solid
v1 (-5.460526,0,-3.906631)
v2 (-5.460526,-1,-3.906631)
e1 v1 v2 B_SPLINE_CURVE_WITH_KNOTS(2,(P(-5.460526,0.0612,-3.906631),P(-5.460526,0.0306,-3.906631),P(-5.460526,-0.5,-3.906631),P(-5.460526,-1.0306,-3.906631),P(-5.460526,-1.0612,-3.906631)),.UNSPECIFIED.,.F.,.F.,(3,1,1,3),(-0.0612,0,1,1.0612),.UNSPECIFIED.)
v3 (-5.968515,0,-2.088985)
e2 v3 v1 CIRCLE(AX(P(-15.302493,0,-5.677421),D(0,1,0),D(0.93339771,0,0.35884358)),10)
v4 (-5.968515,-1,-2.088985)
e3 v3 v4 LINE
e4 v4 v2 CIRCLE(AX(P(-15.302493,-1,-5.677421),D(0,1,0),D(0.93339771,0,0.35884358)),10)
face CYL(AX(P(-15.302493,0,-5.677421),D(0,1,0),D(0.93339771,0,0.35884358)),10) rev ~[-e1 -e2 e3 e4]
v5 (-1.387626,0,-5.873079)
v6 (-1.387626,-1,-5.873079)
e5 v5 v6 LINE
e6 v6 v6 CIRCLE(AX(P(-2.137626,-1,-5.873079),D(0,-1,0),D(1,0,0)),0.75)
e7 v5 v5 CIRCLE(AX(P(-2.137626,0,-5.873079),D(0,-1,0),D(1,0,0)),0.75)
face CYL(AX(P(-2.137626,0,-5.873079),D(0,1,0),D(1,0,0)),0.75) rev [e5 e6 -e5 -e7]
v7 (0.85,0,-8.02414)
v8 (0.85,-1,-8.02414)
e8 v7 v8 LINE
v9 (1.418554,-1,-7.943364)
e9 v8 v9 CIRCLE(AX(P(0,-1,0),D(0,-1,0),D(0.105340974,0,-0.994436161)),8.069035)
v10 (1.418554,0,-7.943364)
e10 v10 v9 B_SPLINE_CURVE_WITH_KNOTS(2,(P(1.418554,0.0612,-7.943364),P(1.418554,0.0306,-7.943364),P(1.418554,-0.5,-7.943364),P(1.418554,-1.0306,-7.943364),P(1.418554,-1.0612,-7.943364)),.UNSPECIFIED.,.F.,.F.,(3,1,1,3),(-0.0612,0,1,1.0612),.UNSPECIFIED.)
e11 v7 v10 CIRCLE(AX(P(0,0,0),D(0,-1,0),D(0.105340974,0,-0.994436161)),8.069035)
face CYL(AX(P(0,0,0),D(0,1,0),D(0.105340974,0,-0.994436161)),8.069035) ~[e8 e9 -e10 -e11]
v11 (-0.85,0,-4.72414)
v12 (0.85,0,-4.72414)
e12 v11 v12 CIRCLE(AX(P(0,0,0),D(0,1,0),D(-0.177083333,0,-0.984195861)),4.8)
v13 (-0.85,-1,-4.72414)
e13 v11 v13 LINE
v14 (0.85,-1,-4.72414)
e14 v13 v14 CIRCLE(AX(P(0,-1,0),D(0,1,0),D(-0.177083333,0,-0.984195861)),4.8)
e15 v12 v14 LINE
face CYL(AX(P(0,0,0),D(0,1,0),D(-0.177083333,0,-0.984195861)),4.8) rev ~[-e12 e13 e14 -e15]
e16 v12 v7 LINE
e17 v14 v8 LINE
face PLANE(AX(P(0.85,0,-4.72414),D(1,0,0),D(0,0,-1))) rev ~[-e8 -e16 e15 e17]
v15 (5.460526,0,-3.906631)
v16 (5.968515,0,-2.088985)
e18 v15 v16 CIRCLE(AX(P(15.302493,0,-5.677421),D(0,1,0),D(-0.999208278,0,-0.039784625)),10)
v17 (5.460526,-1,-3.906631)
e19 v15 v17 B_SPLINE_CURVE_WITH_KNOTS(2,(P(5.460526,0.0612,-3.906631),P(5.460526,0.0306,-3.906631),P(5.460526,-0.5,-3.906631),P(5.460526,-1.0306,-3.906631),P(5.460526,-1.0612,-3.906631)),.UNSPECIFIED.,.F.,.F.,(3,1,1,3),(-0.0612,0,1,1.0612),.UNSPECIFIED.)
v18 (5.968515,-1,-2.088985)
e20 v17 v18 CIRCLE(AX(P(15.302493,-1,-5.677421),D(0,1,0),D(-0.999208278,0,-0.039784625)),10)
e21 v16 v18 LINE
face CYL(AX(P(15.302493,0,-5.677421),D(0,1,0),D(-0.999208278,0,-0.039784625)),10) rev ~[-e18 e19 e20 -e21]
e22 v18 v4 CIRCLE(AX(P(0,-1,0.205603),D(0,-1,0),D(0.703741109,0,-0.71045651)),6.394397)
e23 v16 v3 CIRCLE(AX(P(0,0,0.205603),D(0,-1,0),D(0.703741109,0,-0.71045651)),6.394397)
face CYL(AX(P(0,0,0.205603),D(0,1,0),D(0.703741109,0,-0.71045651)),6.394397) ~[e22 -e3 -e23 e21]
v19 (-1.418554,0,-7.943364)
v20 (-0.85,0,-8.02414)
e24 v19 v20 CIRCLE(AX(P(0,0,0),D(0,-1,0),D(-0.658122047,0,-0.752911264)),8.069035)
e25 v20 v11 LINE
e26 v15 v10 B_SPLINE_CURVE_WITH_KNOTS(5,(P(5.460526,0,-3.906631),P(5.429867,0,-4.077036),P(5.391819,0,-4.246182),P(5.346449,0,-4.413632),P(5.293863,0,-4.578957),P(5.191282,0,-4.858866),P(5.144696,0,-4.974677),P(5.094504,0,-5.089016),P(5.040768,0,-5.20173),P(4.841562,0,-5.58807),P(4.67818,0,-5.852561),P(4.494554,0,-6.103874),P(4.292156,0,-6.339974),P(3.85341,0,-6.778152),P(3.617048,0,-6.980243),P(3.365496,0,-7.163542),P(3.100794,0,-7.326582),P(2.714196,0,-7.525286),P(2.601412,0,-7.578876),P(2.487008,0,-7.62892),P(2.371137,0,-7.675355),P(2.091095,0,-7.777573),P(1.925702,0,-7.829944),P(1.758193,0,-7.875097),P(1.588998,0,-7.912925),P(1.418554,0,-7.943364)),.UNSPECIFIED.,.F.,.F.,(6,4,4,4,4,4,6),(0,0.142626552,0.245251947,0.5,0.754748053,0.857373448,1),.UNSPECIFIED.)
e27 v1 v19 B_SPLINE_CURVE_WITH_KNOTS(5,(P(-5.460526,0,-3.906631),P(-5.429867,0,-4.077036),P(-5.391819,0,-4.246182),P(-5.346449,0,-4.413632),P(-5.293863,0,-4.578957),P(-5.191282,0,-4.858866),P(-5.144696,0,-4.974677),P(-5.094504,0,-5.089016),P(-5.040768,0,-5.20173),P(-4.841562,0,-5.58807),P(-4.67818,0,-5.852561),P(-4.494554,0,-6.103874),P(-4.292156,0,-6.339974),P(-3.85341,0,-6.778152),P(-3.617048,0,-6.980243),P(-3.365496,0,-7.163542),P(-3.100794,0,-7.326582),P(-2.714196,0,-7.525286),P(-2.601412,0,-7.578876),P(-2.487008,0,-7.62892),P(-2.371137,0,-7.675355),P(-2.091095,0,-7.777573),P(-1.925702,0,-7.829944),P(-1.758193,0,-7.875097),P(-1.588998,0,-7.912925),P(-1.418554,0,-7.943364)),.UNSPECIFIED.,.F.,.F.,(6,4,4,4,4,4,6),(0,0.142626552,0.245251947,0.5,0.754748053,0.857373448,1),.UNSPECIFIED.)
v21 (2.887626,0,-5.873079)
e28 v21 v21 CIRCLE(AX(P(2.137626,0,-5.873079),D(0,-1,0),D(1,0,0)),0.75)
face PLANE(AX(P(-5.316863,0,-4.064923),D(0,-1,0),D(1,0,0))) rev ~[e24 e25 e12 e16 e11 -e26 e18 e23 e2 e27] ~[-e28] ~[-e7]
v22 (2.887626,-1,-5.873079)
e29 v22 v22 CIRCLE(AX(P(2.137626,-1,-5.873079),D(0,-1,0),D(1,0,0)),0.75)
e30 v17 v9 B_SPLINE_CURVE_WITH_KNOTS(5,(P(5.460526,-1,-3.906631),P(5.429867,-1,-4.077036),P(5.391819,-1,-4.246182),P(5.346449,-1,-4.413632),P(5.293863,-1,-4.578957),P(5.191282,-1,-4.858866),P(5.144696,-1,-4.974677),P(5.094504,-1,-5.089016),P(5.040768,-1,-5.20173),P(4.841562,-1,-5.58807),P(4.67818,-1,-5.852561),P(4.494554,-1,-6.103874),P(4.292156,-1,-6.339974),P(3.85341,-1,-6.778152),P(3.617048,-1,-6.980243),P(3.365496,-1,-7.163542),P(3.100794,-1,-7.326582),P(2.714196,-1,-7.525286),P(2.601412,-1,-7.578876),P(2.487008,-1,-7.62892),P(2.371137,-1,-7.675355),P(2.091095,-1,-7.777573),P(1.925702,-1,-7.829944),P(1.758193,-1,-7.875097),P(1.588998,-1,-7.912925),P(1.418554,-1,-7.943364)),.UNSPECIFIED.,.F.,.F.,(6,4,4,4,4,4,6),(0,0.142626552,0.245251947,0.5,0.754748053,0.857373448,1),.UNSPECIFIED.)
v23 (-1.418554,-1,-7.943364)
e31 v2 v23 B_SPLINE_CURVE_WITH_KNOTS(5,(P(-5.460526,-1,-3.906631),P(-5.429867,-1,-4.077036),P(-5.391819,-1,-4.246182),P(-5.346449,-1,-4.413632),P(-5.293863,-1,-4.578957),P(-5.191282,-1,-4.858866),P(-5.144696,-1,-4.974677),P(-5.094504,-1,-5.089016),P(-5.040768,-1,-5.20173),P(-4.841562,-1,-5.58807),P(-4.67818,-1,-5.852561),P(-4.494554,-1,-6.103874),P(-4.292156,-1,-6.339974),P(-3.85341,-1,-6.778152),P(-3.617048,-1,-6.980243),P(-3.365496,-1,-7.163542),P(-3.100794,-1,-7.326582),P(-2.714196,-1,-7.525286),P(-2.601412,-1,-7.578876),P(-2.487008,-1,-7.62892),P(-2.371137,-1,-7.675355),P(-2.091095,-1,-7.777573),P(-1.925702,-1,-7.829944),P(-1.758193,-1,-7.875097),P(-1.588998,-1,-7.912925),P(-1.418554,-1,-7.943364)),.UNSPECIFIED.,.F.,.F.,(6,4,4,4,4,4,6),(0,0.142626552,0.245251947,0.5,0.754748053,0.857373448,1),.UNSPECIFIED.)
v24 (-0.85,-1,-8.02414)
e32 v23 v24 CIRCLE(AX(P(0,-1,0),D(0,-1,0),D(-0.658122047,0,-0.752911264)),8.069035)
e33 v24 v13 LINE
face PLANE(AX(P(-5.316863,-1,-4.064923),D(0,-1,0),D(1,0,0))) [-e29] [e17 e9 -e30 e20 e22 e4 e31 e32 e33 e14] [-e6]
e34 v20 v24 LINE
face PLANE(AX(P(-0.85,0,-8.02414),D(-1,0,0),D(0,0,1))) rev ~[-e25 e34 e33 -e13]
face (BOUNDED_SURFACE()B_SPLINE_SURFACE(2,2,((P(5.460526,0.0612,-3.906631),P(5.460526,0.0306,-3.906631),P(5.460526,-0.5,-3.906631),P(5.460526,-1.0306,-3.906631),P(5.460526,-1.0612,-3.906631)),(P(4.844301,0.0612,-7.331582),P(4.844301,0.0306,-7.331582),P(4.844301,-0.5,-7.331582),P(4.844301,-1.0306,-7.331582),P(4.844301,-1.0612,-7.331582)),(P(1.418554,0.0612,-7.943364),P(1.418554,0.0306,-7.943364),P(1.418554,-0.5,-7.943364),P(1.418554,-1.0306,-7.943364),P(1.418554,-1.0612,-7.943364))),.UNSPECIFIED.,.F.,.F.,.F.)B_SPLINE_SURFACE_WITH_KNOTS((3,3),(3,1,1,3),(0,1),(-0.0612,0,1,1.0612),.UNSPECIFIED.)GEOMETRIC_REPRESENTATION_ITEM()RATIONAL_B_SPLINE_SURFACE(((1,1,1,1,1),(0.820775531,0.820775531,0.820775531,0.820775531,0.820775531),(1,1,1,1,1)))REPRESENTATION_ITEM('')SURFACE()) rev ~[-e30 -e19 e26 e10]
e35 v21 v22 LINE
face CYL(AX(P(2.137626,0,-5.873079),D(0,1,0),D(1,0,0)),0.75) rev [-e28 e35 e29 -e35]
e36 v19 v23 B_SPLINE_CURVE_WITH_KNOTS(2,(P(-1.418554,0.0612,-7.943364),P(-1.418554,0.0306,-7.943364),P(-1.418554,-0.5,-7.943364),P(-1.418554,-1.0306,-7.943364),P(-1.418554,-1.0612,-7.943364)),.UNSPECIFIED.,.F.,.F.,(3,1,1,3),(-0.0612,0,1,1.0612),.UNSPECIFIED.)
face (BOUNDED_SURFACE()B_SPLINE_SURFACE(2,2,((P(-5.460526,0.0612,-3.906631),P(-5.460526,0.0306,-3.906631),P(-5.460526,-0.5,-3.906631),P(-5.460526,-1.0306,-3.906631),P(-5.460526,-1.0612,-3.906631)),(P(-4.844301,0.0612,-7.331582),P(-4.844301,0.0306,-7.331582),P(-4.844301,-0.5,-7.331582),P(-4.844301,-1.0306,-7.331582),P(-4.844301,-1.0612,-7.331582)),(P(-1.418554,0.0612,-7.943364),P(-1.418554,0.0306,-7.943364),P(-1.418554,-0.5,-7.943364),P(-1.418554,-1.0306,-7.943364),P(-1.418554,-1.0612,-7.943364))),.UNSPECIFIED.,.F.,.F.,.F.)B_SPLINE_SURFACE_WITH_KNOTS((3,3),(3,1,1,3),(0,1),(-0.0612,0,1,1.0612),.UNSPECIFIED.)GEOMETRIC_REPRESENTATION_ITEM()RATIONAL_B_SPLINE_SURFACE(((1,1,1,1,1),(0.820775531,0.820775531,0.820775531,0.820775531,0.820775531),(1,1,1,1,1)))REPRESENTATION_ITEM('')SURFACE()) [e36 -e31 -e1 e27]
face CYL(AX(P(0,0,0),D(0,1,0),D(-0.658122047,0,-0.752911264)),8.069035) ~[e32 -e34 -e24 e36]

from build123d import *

# Parameters (mm, degrees)
F0_R        = 0.75
F1_DEPTH    = 1
F2_T1_DEPTH = 1
F3_R        = 5


# Not quite as in the source:
# - a fillet or chamfer that OpenCascade refuses, or shapes differently, is made with other operations: its cross-section is extruded or revolved along the edge and cut away or added


with BuildPart() as f1:
    # F0 (on Front) → F1 (new body)
    with BuildSketch(Plane.XZ):
        with BuildLine():
            ThreePointArc((-0.85, -4.7241401334), (0, 4.8), (0.85, -4.7241401334))
            Line((0.85, -4.7241401334), (0.85, -8.0241401334))
            ThreePointArc((0.85, -8.0241401334), (3.2306637909, -7.3940608836), (5.3104097906, -6.0752672975))
            Line((5.3104097906, -6.0752672975), (4.5, -4.3373378932))
            ThreePointArc((4.5, -4.3373378932), (0, 6.6), (-4.5, -4.3373378932))
            Line((-4.5, -4.3373378932), (-5.3104097906, -6.0752672975))
            ThreePointArc((-5.3104097906, -6.0752672975), (-3.2306637909, -7.3940608836), (-0.85, -8.0241401334))
            Line((-0.85, -8.0241401334), (-0.85, -4.7241401334))
        make_face()
        with Locations((-2.1376258958, -5.8730788799)):
            Circle(F0_R, mode=Mode.SUBTRACT)
        with Locations((2.1376258958, -5.8730788799)):
            Circle(F0_R, mode=Mode.SUBTRACT)
    extrude(amount=F1_DEPTH)

    # F2: fillet of radius 10 on 2 edges, made by hand

    # F2_s2 → F2_t1 (join)
    with BuildSketch(Plane.XZ):
        with BuildLine():
            ThreePointArc((-5.9685154732, -2.0889852458), (-5.4360464656, -4.0485437672), (-5.3104097906, -6.0752672975))
            Line((-5.3104097906, -6.0752672975), (-4.5, -4.3373378932))
            ThreePointArc((-4.5, -4.3373378932), (-5.3536180719, -3.2911219818), (-5.9685154732, -2.0889852458))
        make_face()
        with BuildLine():
            ThreePointArc((5.3104097906, -6.0752672975), (5.4360464656, -4.0485437672), (5.9685154732, -2.0889852458))
            ThreePointArc((5.9685154732, -2.0889852458), (5.3536180719, -3.2911219818), (4.5, -4.3373378932))
            Line((4.5, -4.3373378932), (5.3104097906, -6.0752672975))
        make_face()
    extrude(amount=F2_T1_DEPTH)

    # F3
    f3_edges = [f1.edges().sort_by_distance(p)[0] for p in [
        (-5.31041, -0.5, -6.075267),
        (5.31041, -0.5, -6.075267),
    ]]
    fillet(f3_edges, radius=F3_R)


solid = f1.part
